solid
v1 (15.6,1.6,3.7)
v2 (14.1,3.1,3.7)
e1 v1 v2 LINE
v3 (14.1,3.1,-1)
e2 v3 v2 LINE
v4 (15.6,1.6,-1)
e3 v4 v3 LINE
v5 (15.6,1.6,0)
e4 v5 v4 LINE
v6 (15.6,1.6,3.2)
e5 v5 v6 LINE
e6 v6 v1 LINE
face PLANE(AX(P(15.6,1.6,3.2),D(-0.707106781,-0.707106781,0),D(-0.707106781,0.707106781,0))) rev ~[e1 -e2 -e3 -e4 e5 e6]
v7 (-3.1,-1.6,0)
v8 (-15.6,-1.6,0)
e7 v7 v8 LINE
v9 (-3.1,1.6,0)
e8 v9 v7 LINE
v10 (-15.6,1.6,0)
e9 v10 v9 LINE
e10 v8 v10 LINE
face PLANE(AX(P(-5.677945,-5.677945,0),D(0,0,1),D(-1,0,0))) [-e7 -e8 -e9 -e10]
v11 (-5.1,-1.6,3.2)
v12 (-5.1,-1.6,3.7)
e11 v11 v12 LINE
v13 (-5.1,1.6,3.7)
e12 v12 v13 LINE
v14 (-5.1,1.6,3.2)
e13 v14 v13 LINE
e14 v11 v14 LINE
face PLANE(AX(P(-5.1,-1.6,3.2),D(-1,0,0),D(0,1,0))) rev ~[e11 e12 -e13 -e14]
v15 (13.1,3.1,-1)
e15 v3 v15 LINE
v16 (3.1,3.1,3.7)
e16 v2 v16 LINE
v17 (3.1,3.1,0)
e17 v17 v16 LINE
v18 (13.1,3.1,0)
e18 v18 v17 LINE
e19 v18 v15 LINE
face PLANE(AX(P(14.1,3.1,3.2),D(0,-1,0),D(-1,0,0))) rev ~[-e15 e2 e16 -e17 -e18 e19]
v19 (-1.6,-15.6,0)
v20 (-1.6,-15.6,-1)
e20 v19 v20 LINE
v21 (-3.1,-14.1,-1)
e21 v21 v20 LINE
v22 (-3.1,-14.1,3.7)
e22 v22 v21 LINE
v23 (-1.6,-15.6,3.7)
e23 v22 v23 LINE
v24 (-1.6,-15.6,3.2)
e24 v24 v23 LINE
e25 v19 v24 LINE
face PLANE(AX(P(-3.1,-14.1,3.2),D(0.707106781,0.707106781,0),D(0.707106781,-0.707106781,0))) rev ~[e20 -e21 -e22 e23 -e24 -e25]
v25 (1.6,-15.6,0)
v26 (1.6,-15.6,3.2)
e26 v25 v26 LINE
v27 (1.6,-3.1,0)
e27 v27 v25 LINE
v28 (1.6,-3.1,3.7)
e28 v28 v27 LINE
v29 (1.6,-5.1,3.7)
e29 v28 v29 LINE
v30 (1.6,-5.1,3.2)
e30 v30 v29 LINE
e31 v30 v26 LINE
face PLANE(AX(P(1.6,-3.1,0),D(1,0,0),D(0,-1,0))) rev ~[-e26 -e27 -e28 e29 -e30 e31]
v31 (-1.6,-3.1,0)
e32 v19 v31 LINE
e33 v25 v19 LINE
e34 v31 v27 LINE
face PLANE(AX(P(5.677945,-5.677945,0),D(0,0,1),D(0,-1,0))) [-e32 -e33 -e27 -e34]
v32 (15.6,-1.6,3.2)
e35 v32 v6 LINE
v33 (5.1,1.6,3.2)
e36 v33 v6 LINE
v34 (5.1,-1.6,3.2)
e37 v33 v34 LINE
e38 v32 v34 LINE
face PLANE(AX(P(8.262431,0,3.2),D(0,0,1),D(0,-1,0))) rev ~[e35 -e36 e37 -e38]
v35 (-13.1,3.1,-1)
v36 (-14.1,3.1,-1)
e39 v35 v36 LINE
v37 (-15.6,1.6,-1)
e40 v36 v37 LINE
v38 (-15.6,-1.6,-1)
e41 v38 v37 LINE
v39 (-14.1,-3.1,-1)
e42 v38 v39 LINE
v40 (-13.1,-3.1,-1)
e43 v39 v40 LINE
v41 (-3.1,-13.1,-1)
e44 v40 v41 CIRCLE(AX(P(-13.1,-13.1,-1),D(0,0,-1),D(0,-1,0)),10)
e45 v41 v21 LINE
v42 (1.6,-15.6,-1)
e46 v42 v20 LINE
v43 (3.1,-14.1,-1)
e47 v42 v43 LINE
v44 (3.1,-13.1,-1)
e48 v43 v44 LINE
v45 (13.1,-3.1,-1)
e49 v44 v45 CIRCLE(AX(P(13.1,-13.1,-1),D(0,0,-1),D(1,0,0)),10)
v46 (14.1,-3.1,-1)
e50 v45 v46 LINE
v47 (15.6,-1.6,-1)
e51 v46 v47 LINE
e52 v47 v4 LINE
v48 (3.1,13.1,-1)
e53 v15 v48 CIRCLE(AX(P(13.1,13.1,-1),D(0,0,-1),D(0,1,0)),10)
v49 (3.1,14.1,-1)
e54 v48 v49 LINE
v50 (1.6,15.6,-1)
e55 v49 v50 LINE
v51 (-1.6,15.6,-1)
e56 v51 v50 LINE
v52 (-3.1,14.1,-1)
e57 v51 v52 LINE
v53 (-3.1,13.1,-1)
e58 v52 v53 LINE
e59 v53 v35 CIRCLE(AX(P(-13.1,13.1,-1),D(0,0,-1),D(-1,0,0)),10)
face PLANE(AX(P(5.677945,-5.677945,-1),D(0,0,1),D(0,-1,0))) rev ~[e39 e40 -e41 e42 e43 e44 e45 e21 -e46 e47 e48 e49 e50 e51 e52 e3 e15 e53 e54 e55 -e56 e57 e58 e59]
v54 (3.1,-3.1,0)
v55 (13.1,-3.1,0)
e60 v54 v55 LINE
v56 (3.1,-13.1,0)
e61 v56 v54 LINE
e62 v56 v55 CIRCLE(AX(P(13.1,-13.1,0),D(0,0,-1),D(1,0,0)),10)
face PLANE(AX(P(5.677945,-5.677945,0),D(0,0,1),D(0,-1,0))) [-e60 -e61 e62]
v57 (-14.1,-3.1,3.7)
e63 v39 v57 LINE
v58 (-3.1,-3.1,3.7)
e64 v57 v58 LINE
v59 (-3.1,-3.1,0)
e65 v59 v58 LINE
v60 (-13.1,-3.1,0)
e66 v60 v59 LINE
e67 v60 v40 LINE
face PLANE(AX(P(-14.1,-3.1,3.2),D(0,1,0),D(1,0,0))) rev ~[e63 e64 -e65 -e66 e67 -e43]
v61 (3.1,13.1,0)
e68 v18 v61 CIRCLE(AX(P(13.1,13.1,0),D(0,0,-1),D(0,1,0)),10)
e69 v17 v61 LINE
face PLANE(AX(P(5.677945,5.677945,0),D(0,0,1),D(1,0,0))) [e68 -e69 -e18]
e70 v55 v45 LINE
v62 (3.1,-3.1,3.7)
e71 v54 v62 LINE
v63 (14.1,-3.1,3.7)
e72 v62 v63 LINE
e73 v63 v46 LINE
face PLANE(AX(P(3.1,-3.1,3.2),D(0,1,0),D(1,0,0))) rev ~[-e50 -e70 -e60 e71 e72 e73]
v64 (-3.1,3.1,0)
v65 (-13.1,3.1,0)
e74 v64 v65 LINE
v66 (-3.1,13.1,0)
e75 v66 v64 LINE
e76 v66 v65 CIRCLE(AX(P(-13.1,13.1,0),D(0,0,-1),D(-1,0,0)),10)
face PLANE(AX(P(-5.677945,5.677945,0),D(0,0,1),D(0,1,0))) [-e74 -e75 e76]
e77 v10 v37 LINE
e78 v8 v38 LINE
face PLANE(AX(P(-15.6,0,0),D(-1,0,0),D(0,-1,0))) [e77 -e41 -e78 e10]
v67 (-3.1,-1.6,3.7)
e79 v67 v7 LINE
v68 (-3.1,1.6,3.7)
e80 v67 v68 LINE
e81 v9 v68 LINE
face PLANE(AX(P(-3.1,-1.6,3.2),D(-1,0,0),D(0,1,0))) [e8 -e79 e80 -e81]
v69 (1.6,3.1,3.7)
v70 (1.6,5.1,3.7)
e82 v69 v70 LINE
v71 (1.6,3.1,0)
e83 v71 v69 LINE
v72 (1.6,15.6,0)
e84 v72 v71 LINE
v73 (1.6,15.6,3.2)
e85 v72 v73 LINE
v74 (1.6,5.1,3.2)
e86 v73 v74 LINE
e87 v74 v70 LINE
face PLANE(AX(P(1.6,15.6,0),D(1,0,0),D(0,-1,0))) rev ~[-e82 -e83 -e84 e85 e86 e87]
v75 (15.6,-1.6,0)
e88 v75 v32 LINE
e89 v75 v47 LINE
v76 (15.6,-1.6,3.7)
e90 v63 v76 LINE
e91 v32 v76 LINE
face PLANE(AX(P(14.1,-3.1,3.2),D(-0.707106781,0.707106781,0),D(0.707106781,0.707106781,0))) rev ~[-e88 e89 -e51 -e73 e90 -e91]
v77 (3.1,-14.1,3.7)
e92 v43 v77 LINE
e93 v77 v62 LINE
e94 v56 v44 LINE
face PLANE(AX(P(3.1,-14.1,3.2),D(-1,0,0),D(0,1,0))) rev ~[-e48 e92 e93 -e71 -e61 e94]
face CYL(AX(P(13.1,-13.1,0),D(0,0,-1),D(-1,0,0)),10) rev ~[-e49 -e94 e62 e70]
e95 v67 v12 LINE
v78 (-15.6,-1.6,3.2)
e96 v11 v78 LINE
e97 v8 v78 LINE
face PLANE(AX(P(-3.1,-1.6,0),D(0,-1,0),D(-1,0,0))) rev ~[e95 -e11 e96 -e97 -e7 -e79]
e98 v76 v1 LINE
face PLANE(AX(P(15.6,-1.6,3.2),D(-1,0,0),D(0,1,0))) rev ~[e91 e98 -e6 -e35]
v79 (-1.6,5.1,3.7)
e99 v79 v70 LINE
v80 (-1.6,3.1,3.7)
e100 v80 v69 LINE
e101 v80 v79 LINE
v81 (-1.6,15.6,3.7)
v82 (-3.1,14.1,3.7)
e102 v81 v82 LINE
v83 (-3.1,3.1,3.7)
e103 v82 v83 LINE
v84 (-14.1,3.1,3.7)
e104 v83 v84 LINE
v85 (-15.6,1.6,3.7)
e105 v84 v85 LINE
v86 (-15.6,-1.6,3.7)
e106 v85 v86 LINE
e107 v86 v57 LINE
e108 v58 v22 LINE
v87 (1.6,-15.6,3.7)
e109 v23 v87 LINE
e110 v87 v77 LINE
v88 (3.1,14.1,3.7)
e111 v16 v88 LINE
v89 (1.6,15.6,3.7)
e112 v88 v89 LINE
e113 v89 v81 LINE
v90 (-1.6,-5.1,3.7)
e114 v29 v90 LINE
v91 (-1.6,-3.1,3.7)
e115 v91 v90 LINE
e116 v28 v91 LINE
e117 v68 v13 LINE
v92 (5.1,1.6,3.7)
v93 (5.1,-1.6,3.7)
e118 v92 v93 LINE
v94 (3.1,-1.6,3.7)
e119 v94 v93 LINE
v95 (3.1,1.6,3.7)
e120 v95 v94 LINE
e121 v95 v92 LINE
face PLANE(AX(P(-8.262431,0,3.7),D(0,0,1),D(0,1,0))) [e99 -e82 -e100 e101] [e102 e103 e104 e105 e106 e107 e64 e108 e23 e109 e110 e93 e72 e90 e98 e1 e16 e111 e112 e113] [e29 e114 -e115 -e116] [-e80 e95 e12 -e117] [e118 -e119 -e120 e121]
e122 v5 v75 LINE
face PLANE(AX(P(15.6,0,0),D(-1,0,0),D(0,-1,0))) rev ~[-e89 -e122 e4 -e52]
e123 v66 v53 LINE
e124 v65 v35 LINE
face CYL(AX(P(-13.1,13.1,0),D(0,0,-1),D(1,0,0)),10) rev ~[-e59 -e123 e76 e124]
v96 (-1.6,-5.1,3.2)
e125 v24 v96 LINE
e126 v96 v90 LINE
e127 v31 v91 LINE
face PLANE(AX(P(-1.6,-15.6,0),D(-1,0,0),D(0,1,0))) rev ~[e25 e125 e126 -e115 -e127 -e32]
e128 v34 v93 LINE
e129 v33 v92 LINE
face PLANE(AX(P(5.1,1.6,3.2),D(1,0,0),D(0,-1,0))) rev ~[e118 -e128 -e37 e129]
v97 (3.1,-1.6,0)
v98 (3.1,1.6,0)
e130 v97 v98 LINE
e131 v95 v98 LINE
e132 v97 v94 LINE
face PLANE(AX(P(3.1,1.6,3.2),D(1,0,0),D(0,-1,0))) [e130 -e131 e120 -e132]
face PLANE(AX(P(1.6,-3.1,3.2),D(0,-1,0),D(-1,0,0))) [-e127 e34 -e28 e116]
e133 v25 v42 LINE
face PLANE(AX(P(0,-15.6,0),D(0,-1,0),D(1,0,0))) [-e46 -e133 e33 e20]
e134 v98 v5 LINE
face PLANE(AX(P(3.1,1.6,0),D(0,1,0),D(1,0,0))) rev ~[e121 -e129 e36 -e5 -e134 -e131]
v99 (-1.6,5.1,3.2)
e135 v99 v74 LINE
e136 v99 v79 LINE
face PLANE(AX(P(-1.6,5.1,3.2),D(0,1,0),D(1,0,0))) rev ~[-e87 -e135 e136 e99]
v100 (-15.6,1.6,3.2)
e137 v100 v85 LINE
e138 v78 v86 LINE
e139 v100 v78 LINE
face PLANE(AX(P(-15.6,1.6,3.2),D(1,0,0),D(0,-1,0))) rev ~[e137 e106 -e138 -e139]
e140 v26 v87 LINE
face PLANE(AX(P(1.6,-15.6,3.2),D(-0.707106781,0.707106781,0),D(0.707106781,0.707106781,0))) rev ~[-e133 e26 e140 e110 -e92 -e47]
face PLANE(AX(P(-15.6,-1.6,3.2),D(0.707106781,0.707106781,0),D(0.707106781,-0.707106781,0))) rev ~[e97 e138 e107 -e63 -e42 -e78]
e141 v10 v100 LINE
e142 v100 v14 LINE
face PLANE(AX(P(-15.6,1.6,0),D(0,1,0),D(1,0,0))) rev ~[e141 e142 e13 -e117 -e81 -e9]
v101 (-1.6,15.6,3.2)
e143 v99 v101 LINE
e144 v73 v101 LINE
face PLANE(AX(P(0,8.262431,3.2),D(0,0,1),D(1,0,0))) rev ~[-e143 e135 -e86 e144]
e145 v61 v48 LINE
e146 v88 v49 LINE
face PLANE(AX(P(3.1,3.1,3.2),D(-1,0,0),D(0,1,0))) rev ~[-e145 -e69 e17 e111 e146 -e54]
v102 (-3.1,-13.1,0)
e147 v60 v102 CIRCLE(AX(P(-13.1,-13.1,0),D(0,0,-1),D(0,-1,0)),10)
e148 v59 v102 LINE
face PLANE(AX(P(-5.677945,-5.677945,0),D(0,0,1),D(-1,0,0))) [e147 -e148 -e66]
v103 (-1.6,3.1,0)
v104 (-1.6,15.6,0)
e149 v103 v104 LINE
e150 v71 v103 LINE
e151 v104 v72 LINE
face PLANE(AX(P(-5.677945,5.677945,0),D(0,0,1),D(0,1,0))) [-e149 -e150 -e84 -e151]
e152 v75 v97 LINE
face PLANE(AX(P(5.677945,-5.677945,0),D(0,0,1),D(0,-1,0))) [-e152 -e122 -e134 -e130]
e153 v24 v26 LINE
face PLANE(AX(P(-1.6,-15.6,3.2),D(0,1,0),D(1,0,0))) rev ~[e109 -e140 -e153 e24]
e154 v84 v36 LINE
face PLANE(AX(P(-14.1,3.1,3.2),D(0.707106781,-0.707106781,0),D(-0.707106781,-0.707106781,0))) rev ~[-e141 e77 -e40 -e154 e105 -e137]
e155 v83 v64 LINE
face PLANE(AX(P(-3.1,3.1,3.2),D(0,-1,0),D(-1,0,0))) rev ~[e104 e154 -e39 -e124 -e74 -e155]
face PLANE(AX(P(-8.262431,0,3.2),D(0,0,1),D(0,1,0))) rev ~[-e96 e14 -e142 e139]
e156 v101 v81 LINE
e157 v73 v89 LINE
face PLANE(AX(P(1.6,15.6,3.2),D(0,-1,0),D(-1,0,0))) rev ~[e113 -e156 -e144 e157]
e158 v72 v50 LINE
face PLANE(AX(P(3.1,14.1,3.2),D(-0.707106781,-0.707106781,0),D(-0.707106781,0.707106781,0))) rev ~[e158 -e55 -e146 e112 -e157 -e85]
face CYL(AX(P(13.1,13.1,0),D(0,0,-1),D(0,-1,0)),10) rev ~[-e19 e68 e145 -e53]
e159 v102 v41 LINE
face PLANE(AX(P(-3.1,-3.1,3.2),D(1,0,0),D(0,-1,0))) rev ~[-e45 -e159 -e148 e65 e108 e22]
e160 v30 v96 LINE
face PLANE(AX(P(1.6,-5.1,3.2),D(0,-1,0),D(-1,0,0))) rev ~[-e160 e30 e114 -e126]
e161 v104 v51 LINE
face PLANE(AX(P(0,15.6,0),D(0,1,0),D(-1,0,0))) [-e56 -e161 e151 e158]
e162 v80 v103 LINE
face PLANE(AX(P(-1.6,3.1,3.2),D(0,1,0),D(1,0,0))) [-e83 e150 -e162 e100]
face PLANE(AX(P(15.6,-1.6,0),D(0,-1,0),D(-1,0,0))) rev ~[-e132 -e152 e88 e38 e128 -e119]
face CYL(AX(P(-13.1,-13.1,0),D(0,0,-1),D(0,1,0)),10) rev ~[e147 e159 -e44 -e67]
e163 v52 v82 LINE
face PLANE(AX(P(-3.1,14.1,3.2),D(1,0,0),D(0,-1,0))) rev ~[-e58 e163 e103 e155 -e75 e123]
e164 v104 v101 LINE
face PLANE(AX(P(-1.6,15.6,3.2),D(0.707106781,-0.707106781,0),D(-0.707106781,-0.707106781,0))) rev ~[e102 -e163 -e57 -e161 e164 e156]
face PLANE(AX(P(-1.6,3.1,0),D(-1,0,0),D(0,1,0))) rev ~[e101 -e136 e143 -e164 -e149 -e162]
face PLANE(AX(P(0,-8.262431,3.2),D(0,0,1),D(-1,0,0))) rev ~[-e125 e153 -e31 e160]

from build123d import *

# Parameters (mm, degrees)
F0_W     = 1.6
F0_H     = 12.5
F0_W_2   = 12.5
F0_H_2   = 1.6
F1_DEPTH = 1
F2_R     = 10
F3_DEPTH = 3.2
F4_COUNT = 4
F5_W     = 3.2
F5_H     = 2
F6_DEPTH = 0.5
F7_COUNT = 4


# Not quite as in the source:
# - a feature names something its author has since deleted; it is built from what else it names


with BuildPart() as f1:
    # F0 (on Top) → F1 (new body)
    with BuildSketch(Plane.XY):
        Polygon((3.1, 14.1), (1.6, 15.6), (1.6, 3.1), (1.6, 1.6), (3.1, 1.6), (15.6, 1.6), (14.1, 3.1), (3.1, 3.1), align=None)
        with Locations((0.8, 9.35)):
            Rectangle(F0_W, F0_H)
        Polygon((1.6, 1.6), (1.6, 3.1), (0, 3.1), (0, 0), (3.1, 0), (3.1, 1.6), align=None)
        with Locations((9.35, 0.8)):
            Rectangle(F0_W_2, F0_H_2)
    extrude(amount=-F1_DEPTH)

    # F2
    f2_edges = [f1.edges().sort_by_distance(p)[0] for p in [
        (3.1, 3.1, -0.5),
    ]]
    fillet(f2_edges, radius=F2_R)

    # F0 (on Top) → F3 (join)
    with BuildSketch(Plane.XY):
        Polygon((3.1, 14.1), (1.6, 15.6), (1.6, 3.1), (1.6, 1.6), (3.1, 1.6), (15.6, 1.6), (14.1, 3.1), (3.1, 3.1), align=None)
        Polygon((1.6, 1.6), (1.6, 3.1), (0, 3.1), (0, 0), (3.1, 0), (3.1, 1.6), align=None)
    extrude(amount=F3_DEPTH)

    # F4: F1 ×4 about axis
    f4_axis = Axis((0, 0, -0.5), (0, 0, 1))


with BuildPart() as f1_1:
    add(f1.part)
    for i in range(1, F4_COUNT):
        add(f1.part.rotate(f4_axis, i * 360 / F4_COUNT))



with BuildPart() as f6:
    # F5 (on face) → F6 (new body)
    with BuildSketch(Plane.XY.offset(3.2)):
        Polygon((1.6, 15.6), (-1.6, 15.6), (-3.1, 14.1), (-3.1, 3.1), (0, 0), (3.1, 3.1), (3.1, 14.1), align=None)
        with Locations((0, 4.1)):
            Rectangle(F5_W, F5_H, mode=Mode.SUBTRACT)
    extrude(amount=F6_DEPTH)


with BuildPart() as f1_2:
    add(f1_1.part)

    add(f6.part)  # F7 merges F6
    # F7: F6 ×4 about axis
    f7_axis = Axis((0, 0, 3.45), (0, 0, -1))
    for i in range(1, F7_COUNT):
        add(f6.part.rotate(f7_axis, i * 360 / F7_COUNT))


solid = f1_2.part
